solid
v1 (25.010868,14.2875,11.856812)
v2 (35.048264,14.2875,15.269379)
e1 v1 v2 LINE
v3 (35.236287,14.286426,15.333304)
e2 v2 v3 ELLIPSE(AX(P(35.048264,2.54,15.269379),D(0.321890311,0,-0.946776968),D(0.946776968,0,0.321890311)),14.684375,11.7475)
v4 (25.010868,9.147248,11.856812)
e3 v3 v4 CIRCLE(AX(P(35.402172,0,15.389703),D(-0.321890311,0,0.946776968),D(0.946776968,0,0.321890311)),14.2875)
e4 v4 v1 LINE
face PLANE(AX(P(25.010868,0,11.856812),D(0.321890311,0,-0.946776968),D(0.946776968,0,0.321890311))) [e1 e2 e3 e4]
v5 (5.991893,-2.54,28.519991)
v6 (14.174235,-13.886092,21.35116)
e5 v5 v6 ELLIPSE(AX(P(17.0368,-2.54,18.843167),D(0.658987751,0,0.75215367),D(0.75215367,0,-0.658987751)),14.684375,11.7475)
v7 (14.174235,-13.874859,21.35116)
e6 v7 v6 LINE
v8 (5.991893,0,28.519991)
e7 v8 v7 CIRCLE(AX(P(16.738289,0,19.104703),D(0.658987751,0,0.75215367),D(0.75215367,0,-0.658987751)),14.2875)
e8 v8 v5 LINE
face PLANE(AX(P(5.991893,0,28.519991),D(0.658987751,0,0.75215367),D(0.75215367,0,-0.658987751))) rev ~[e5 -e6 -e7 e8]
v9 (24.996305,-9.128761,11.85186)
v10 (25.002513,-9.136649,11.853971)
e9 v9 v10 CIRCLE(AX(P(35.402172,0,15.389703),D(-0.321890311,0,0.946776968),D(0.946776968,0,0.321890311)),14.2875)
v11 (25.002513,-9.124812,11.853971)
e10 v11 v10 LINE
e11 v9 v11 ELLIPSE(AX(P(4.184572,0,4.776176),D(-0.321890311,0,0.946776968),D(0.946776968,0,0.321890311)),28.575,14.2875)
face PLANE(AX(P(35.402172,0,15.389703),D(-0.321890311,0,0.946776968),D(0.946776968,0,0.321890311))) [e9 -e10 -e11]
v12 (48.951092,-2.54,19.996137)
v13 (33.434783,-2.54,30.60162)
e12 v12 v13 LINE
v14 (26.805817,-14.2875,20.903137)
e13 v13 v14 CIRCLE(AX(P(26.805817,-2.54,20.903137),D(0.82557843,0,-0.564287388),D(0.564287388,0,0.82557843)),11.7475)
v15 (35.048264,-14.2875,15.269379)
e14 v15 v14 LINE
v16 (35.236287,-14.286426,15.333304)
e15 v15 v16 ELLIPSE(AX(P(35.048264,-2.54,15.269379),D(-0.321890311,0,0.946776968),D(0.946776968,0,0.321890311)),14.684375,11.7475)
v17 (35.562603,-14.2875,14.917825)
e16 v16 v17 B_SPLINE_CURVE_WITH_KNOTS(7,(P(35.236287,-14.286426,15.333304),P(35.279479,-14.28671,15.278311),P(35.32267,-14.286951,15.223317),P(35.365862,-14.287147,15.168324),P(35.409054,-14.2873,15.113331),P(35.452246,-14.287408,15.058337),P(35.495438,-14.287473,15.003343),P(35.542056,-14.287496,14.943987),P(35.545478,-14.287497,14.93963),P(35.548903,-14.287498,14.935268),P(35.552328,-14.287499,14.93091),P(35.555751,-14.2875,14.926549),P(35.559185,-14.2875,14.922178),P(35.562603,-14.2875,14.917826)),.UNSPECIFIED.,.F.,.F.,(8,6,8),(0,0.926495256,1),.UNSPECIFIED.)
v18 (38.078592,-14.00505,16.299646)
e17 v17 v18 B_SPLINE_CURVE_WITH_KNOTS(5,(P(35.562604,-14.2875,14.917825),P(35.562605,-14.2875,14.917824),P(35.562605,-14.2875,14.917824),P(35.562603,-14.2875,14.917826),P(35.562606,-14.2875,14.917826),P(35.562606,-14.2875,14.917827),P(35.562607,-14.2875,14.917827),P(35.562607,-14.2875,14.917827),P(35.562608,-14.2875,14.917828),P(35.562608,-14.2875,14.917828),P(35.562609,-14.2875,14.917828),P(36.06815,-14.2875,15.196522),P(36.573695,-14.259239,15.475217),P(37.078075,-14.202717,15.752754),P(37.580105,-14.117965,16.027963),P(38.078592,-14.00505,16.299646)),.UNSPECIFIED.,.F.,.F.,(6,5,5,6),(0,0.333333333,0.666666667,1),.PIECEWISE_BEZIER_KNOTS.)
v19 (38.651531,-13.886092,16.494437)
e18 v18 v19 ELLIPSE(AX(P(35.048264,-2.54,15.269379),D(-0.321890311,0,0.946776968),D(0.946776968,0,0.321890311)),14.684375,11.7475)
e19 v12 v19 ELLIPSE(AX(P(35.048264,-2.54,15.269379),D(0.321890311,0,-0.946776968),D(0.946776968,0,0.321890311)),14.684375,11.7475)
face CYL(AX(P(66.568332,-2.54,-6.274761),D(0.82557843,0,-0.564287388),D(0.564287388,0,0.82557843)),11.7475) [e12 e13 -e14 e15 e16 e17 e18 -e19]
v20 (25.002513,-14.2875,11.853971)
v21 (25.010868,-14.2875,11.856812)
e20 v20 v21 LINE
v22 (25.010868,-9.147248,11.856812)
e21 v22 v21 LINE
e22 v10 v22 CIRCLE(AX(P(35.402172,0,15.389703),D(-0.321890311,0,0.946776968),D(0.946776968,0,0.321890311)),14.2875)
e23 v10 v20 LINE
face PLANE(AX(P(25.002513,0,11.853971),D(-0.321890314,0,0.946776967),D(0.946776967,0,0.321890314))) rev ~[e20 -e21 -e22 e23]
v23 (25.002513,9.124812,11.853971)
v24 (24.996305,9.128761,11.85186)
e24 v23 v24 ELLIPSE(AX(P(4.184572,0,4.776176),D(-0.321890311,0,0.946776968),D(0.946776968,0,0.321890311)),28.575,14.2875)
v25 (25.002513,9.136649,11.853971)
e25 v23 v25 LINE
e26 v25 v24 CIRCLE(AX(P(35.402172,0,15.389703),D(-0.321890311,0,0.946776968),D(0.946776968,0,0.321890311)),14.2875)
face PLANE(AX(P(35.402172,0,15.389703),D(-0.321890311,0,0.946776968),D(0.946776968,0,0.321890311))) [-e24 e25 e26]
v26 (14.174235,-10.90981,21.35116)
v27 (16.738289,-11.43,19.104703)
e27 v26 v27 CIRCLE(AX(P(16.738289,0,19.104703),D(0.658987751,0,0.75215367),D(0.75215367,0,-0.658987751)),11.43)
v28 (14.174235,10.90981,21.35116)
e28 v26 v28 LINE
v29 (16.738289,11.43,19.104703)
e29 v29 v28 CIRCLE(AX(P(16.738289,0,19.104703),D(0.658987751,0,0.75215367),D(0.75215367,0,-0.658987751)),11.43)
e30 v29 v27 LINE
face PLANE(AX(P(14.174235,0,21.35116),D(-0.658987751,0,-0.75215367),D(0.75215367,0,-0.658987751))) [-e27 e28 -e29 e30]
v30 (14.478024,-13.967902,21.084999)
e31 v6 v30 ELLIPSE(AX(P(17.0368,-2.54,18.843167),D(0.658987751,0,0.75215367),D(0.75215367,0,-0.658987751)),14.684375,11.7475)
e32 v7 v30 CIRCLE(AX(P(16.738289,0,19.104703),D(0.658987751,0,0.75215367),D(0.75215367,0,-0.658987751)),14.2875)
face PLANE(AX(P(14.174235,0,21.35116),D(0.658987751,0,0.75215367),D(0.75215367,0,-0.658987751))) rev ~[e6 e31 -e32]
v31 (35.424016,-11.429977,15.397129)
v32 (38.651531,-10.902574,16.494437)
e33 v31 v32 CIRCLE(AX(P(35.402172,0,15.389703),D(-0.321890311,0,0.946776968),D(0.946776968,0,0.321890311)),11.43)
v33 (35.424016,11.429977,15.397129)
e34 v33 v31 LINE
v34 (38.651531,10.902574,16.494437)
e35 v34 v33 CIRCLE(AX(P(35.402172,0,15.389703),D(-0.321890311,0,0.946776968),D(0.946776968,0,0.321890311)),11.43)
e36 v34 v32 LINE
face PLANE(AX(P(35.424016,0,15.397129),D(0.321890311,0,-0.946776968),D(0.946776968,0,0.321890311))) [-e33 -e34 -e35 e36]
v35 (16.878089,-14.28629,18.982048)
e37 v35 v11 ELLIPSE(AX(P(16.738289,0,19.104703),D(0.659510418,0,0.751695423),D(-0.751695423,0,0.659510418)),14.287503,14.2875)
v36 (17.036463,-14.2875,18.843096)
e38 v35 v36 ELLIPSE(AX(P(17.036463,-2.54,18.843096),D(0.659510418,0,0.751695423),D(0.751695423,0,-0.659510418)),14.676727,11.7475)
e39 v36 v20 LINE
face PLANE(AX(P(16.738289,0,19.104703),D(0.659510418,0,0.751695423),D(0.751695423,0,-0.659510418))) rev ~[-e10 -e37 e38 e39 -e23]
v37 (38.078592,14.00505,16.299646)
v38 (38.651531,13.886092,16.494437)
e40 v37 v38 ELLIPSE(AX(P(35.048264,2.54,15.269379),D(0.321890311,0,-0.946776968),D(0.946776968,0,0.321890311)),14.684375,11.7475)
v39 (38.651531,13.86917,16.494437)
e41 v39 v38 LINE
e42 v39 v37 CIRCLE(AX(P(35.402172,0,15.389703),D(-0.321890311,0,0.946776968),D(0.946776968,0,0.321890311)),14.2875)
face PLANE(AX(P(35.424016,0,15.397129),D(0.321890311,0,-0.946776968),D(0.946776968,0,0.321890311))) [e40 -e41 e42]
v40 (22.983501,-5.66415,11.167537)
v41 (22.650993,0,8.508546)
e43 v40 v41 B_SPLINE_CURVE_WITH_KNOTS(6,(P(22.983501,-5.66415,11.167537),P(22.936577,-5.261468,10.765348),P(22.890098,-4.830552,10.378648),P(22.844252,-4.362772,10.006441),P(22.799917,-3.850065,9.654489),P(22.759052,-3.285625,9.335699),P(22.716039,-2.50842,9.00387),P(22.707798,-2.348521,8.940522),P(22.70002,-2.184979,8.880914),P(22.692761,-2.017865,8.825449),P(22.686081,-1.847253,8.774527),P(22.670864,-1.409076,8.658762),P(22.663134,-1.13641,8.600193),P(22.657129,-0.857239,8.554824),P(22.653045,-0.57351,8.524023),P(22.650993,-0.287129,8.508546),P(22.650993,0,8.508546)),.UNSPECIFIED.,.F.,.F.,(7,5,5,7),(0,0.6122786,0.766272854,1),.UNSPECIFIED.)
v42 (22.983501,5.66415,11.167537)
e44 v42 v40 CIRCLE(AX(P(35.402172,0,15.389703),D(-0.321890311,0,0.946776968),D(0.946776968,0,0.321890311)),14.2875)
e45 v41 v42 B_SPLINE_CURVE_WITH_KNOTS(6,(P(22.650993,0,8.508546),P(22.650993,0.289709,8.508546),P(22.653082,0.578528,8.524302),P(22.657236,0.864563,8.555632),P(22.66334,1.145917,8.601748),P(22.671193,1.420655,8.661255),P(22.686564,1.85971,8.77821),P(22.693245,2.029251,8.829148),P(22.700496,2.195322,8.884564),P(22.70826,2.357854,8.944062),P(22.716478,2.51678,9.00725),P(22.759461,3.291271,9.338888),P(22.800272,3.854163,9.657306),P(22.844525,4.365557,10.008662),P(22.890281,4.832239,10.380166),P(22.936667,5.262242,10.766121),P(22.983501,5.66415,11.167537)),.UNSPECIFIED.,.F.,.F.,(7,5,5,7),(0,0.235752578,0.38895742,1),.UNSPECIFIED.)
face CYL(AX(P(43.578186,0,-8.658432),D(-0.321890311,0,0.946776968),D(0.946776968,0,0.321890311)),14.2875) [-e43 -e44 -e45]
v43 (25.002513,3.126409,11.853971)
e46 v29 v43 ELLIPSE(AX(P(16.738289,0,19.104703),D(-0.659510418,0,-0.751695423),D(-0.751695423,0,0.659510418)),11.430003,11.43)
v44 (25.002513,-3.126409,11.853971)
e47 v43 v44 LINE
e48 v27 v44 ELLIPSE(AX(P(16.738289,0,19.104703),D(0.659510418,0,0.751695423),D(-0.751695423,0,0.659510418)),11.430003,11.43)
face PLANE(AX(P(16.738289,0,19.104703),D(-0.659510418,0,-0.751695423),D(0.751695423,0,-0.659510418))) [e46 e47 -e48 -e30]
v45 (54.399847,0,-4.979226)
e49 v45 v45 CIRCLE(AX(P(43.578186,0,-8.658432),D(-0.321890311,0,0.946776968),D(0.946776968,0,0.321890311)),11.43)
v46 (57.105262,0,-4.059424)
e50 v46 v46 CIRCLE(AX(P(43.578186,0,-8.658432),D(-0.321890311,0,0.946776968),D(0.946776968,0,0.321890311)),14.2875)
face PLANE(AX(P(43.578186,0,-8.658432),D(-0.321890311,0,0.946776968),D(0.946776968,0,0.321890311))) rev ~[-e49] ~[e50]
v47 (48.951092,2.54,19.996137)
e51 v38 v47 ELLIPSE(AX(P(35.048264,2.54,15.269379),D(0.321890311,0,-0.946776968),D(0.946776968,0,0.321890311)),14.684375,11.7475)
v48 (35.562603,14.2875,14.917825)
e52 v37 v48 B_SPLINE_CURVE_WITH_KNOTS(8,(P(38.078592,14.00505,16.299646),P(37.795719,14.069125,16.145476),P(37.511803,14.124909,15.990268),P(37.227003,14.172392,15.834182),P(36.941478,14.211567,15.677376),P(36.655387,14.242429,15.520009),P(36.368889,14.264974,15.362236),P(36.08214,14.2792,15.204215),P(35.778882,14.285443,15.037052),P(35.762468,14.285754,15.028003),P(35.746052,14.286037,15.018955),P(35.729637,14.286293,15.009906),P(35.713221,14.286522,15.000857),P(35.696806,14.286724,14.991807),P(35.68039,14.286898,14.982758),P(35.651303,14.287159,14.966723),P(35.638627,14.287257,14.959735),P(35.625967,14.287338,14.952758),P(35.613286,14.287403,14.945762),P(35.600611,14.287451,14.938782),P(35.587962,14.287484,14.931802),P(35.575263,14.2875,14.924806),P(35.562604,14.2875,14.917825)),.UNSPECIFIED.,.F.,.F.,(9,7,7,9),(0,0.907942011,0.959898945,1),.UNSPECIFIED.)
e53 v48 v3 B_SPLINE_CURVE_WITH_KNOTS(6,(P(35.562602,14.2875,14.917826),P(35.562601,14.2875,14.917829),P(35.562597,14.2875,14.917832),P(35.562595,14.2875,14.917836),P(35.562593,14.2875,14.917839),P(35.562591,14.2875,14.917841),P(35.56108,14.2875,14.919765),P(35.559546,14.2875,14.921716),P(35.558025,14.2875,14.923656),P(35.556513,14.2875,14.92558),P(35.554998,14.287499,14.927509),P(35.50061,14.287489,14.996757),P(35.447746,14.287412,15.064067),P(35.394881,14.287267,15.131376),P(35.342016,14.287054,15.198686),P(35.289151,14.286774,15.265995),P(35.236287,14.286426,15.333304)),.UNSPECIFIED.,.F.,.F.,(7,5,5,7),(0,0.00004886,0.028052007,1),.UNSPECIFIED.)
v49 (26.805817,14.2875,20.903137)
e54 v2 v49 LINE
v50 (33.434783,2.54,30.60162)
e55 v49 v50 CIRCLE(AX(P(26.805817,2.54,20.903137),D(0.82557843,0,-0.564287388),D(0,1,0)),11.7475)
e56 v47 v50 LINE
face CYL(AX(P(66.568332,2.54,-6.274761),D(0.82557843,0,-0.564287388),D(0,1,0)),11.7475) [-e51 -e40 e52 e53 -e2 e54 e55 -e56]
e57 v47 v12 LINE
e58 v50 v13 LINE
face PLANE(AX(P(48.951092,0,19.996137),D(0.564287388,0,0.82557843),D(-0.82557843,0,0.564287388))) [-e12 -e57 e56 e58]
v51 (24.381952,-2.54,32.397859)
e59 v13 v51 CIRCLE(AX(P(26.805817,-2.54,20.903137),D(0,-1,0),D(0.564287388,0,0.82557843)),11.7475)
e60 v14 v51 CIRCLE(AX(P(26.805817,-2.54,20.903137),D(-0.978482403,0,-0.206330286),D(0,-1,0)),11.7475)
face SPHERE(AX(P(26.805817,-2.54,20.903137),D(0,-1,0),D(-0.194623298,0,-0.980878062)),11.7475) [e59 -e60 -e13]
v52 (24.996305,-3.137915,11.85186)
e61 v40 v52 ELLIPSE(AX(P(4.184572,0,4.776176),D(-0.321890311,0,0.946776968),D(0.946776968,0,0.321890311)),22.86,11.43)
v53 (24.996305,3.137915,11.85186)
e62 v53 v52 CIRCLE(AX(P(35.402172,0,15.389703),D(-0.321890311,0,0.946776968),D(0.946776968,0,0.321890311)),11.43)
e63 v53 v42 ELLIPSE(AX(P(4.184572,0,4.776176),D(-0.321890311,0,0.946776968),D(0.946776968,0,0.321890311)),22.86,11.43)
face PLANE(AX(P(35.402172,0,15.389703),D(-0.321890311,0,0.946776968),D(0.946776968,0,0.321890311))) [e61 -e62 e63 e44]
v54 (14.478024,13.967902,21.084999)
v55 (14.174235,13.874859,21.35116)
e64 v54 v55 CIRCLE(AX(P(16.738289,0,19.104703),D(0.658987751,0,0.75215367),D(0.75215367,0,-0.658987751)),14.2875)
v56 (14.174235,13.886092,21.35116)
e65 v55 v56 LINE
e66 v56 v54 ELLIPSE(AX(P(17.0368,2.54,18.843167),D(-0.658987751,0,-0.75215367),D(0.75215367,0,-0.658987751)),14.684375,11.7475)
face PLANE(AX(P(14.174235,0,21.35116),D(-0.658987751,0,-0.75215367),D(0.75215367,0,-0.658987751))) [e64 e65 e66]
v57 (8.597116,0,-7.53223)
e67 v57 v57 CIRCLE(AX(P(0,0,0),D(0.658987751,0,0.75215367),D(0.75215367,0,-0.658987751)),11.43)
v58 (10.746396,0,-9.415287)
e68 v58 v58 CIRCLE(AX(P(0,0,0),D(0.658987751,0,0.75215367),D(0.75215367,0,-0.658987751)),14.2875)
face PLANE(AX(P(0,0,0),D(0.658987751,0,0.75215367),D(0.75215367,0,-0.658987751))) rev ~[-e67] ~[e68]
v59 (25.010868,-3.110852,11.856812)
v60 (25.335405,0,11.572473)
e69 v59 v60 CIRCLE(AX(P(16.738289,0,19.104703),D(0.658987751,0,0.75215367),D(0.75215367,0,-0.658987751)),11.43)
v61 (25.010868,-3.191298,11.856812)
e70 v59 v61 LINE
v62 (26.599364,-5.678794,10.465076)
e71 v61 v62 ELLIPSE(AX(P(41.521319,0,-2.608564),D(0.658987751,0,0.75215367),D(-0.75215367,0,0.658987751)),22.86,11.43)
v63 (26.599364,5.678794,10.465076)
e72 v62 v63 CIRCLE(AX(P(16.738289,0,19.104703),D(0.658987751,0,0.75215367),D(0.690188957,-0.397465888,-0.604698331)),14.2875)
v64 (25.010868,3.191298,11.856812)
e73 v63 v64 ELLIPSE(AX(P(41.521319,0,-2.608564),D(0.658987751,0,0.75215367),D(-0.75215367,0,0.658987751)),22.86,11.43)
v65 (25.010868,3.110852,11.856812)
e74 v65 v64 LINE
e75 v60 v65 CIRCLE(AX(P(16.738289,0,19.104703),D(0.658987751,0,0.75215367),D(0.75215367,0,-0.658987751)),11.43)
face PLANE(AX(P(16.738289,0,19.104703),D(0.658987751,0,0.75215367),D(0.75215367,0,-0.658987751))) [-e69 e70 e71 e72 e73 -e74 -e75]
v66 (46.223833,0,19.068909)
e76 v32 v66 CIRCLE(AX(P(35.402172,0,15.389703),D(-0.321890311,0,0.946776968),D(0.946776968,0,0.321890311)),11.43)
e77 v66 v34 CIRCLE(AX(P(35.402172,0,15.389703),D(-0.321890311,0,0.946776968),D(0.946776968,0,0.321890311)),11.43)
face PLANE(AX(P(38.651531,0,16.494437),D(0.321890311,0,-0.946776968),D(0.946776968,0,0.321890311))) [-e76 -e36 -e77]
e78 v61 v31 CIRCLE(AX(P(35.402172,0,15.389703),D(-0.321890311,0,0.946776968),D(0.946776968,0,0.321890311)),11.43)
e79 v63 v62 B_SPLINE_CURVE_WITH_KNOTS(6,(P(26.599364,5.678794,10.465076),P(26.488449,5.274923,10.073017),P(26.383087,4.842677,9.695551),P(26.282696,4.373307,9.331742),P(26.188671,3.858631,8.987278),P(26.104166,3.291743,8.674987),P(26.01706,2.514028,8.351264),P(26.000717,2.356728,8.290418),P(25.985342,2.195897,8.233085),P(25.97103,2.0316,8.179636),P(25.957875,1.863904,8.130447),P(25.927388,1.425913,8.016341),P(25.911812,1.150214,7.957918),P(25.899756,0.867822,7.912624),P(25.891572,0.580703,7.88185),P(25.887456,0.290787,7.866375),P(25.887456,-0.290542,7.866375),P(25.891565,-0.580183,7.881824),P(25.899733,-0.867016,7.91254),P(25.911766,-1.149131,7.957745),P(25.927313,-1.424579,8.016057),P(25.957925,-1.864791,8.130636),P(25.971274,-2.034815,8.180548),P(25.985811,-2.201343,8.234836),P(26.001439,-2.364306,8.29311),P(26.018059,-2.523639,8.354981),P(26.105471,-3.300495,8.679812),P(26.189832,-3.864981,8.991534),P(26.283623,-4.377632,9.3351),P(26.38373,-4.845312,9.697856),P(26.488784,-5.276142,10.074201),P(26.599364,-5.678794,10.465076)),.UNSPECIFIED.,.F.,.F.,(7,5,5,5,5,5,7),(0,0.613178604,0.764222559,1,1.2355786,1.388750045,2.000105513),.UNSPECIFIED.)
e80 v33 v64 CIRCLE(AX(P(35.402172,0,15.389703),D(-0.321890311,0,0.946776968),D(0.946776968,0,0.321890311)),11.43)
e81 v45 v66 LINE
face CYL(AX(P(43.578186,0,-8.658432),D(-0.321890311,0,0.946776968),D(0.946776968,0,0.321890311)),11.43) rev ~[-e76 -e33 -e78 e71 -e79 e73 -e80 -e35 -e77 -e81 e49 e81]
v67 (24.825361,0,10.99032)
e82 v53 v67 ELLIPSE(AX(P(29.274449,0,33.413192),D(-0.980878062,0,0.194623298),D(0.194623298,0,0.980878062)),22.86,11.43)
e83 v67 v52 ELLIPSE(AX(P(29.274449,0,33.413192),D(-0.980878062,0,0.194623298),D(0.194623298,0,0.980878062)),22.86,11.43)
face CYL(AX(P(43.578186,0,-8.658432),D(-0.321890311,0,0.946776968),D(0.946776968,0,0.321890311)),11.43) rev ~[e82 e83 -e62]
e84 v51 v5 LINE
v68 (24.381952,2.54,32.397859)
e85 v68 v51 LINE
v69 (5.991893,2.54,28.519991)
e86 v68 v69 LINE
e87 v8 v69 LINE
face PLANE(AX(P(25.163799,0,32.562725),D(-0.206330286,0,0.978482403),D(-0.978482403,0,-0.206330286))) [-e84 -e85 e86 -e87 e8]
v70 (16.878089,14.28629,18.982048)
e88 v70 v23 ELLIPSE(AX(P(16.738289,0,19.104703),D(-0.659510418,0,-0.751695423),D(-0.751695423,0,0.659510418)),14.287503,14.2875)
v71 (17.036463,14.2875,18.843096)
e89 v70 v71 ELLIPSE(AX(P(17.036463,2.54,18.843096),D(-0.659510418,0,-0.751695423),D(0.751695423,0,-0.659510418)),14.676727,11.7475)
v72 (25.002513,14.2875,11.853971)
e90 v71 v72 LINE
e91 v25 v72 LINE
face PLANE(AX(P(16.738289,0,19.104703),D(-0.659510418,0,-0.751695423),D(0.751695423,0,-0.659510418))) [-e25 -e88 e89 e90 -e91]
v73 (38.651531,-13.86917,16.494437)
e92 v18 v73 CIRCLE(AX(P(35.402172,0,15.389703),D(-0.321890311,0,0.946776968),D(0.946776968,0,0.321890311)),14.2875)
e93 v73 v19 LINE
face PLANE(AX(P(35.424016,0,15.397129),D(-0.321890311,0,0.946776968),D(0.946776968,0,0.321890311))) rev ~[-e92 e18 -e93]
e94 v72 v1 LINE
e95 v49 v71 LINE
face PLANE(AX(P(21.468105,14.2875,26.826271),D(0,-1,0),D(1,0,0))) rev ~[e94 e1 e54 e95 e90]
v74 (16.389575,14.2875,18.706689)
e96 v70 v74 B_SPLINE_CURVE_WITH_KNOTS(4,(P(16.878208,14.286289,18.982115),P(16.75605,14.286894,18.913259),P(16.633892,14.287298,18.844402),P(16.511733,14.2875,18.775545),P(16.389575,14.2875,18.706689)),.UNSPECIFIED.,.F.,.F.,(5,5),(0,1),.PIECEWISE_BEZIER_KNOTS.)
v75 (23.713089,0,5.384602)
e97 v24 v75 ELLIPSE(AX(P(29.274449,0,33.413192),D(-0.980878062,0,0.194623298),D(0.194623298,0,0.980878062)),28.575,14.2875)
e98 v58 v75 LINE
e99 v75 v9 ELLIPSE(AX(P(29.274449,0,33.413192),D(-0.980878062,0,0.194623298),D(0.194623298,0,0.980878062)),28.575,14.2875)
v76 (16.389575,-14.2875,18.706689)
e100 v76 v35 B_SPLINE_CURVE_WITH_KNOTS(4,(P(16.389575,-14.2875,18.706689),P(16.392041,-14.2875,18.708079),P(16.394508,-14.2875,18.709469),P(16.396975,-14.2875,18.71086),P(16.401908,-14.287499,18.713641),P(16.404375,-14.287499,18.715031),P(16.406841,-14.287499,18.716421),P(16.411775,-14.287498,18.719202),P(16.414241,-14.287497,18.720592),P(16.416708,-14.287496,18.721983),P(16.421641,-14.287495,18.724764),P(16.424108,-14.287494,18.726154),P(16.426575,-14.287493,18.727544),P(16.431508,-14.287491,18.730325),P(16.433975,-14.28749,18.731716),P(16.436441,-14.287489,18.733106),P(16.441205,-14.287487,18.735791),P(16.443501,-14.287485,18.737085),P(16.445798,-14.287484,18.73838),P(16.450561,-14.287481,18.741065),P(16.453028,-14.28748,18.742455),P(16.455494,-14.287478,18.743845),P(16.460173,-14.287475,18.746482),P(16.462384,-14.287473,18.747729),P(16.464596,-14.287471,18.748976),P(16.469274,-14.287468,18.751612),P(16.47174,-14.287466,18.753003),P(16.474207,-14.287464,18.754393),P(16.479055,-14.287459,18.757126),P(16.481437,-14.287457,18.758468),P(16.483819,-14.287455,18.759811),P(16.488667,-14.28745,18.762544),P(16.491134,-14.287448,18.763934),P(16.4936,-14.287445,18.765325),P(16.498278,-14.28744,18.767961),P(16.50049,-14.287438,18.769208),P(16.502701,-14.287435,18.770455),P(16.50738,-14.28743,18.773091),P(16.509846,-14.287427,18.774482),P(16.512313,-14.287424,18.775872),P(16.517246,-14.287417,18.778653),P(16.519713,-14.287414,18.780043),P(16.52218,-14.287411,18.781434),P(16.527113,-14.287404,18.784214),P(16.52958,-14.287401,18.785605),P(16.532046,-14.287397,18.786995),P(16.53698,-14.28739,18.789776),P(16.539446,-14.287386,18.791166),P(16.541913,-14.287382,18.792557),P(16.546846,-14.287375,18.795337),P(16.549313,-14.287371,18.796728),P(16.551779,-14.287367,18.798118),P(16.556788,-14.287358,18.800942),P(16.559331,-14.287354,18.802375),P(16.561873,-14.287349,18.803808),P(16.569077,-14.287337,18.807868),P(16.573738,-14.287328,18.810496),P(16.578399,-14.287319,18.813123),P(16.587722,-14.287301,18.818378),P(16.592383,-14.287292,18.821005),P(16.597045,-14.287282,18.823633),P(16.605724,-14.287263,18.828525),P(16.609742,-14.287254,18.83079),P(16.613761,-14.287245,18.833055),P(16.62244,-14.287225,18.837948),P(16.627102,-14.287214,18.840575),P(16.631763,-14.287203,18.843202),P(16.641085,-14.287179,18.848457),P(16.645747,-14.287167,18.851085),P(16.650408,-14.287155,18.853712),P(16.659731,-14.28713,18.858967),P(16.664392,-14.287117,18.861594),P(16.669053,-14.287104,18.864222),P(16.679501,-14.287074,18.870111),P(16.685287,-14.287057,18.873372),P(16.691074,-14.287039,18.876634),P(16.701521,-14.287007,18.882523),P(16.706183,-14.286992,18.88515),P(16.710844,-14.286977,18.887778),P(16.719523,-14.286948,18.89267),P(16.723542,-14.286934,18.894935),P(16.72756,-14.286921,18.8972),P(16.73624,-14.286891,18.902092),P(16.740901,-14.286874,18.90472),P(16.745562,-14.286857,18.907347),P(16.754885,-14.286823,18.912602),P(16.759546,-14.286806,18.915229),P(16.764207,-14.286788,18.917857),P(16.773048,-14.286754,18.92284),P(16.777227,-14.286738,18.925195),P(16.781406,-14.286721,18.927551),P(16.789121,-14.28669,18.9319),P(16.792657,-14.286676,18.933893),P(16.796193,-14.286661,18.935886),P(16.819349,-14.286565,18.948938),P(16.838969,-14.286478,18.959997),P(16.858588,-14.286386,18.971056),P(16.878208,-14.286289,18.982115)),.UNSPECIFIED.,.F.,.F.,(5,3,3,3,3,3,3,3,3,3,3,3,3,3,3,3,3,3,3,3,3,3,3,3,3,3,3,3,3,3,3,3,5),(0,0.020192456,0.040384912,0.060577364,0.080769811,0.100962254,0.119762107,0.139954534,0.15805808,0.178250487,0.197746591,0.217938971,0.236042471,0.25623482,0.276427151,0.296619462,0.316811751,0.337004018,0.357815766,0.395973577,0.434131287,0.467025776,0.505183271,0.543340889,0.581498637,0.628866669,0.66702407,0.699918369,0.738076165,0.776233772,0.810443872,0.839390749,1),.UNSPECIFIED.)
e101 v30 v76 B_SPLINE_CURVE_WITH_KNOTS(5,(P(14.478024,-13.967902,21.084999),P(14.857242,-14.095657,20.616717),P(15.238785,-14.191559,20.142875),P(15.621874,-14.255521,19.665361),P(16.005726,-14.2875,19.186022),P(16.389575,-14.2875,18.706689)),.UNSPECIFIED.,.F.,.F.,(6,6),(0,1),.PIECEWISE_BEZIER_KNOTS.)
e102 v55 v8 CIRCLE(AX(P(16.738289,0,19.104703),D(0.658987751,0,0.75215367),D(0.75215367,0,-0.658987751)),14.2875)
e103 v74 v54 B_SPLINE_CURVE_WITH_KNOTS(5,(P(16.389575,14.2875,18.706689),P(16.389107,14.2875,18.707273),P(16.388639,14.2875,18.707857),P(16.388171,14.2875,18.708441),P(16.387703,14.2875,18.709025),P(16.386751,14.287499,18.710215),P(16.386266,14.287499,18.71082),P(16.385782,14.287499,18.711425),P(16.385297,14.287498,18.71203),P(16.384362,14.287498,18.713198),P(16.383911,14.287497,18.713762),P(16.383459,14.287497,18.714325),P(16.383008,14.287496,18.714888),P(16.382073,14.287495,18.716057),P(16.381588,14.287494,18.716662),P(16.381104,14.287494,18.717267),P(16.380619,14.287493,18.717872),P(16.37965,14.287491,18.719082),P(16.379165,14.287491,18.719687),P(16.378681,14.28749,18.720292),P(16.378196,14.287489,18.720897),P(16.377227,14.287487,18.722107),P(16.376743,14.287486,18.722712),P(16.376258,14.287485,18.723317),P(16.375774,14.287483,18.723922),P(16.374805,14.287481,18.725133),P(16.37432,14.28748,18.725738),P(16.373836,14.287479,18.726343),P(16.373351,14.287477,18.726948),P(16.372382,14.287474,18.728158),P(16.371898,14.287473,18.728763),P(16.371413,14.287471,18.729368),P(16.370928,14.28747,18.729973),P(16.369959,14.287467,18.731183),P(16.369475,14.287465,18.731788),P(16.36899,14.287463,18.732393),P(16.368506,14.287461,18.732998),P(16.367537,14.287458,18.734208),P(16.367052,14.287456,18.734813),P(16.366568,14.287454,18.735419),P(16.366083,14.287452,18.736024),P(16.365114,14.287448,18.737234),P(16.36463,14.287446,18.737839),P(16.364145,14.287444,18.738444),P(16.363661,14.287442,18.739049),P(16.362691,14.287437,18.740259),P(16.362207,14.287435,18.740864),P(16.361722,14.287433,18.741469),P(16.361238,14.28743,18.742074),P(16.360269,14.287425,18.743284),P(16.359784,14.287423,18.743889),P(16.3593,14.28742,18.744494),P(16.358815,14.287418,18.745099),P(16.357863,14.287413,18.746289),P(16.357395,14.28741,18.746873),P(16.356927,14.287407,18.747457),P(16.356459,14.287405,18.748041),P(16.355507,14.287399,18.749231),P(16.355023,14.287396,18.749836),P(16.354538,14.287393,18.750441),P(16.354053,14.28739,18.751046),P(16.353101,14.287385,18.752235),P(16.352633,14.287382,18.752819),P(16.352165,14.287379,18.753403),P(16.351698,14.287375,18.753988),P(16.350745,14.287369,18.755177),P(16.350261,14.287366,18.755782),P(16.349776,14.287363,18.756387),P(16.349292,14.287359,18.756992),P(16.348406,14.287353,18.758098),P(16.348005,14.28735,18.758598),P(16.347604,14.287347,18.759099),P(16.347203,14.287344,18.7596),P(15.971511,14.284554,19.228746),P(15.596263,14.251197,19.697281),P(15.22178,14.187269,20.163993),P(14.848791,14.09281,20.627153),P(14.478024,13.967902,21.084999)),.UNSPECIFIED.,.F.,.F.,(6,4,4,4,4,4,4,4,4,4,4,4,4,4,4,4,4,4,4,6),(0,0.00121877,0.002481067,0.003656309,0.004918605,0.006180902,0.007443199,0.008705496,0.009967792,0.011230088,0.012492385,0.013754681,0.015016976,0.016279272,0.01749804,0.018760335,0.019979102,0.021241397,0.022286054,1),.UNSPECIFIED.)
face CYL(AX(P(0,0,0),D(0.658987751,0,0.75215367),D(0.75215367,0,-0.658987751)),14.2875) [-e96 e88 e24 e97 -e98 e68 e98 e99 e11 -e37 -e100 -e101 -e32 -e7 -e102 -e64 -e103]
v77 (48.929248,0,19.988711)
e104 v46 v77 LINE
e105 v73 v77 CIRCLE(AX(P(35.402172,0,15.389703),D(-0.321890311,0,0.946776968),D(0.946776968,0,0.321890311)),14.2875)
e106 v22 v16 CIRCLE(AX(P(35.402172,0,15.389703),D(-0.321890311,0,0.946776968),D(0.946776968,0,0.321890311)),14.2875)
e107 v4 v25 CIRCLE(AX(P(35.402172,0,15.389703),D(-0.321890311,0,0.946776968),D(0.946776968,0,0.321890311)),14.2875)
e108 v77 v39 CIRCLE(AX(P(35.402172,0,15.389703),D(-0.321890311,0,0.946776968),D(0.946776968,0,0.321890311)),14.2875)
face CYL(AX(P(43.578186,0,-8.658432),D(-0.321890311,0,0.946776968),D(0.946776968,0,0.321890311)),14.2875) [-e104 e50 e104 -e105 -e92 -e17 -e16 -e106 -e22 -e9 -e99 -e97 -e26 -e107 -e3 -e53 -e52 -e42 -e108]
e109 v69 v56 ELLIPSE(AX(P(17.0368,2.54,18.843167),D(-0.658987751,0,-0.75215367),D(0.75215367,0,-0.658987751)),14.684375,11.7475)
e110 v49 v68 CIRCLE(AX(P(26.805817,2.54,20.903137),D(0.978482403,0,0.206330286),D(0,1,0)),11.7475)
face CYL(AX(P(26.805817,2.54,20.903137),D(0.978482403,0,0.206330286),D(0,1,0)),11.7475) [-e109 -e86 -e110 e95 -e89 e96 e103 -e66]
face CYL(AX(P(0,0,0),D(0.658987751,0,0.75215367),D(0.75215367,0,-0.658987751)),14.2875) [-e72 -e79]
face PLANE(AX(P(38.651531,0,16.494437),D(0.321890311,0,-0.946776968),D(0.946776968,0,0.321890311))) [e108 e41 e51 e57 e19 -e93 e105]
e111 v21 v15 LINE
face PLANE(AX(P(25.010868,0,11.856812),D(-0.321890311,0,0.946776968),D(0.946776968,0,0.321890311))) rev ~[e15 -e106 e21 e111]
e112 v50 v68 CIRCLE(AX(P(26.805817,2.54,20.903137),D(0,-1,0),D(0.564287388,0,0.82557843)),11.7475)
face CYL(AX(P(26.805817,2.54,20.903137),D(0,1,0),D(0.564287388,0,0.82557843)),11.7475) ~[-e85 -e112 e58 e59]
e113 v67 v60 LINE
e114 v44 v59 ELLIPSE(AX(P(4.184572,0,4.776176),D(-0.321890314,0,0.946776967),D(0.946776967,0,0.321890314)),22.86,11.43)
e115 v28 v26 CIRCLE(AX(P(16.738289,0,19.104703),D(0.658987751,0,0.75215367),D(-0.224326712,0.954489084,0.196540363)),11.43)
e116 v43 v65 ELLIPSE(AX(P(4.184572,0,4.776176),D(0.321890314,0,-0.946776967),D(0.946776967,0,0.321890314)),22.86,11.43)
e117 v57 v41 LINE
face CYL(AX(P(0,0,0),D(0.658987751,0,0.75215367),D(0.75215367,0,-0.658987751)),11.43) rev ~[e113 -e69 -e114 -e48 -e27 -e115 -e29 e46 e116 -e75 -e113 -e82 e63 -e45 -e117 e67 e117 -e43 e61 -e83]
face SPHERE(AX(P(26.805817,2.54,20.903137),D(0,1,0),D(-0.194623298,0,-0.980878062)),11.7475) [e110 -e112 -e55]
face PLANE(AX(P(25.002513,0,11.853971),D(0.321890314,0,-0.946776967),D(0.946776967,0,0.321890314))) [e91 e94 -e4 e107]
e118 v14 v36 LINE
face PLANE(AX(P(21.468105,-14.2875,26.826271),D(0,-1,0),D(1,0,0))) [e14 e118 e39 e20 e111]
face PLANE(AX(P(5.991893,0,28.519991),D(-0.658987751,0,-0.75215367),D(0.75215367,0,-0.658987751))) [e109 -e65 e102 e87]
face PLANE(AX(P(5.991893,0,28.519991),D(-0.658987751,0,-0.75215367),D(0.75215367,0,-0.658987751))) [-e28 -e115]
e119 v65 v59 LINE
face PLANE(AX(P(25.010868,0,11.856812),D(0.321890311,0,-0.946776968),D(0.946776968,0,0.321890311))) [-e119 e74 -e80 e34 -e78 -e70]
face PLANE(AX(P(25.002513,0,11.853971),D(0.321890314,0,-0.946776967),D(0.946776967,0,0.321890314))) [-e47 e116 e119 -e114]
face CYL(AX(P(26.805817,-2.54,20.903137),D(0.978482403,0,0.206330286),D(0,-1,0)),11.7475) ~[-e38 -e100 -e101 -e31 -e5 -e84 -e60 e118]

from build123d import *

# Parameters (mm, degrees)
F2_R          = 14.2875
F2_R_2        = 11.43
F5_R          = 14.2875
F5_R_2        = 11.43
F7_DEPTH      = 14.2875
F7_DEPTH_BACK = 14.2875
F8_T1_DEPTH   = 48.1632201407
F8_T3_DEPTH   = 48.1632201407
F8_T5_DEPTH   = 5.08
F8_T10_DEPTH  = 11.7475
F8_T16_DEPTH  = 11.7475


# Not quite as in the source:
# - a fillet or chamfer that OpenCascade refuses, or shapes differently, is made with other operations: its cross-section is extruded or revolved along the edge and cut away or added


with BuildPart() as f3:
    # F3: sweep along a path in F0
    with BuildLine(Plane.XZ) as f3_path:
        Line((43.6000298417, -8.651005595), (35.4240159518, 15.3971294028))
    # F2 (on line) → F3 (sweep)
    with BuildSketch(Plane(origin=(7.1540121537, 0, -21.0421181231), x_dir=(0.9467769684, 0, 0.3218903106), z_dir=(-0.3218903106, 0, 0.9467769684))):
        with Locations((38.471757228, 0)):
            Circle(F2_R)
        with Locations((38.471757228, 0)):
            Circle(F2_R_2, mode=Mode.SUBTRACT)
    sweep(path=f3_path.line)

    # F6: sweep along a path in F0
    with BuildLine(Plane.XZ) as f6_path:
        Line((0, 0), (16.7382888768, 19.1047032292))
    # F5 (on face) → F6 (sweep)
    with BuildSketch(Plane(origin=(0, 0, 0), x_dir=(0.7521536704, 0, -0.6589877511), z_dir=(0.6589877511, 0, 0.7521536704))):
        Circle(F5_R)
        Circle(F5_R_2, mode=Mode.SUBTRACT)
    sweep(path=f6_path.line)

    # F0 (on Front) → F7 (join, two sides)
    with BuildSketch(Plane.XZ) as f7_sk:
        with BuildLine():
            Line((14.1742345569, 21.3511595802), (16.7382888768, 19.1047032292))
            Line((16.7382888768, 19.1047032292), (29.2920055344, 33.4332306512))
            Line((29.2920055344, 33.4332306512), (25.1637988833, 32.5627254125))
            add(Edge.make_bspline(
                [(14.1742345569, 21.3511595802), (18.1555587274, 26.691715757), (21.8910272526, 30.7931889907), (25.1637988833, 32.5627254125)],
                knots=[0.2192972469, 0.2192972469, 0.2192972469, 0.2192972469, 0.4127143591, 0.4127143591, 0.4127143591, 0.4127143591], degree=3))
        make_face()
        Polygon((29.2920055344, 33.4332306512), (16.7382888768, 19.1047032292), (25.0025134025, 11.8539710829), (25.0108680409, 11.8568115377), align=None)
        with BuildLine():
            Line((5.9918933103, 28.5199907224), (14.1742345569, 21.3511595802))
            add(Edge.make_bspline(
                [(14.1742345569, 21.3511595802), (18.1555587274, 26.691715757), (21.8910272526, 30.7931889907), (25.1637988833, 32.5627254125)],
                knots=[0.2192972469, 0.2192972469, 0.2192972469, 0.2192972469, 0.4127143591, 0.4127143591, 0.4127143591, 0.4127143591], degree=3))
            Line((25.1637988833, 32.5627254125), (5.9918933103, 28.5199907224))
        make_face()
        with BuildLine():
            Line((32.7751119786, 31.0525082771), (29.2920055344, 33.4332306512))
            Line((29.2920055344, 33.4332306512), (35.4240159518, 15.3971294028))
            Line((35.4240159518, 15.3971294028), (38.6515313802, 16.4944374051))
            add(Edge.make_bspline(
                [(32.7751119786, 31.0525082771), (35.1243349239, 28.1674701754), (37.0108609747, 22.9504952618), (38.6515313802, 16.4944374051)],
                knots=[0.5872856409, 0.5872856409, 0.5872856409, 0.5872856409, 0.7807027531, 0.7807027531, 0.7807027531, 0.7807027531], degree=3))
        make_face()
        Polygon((35.4240159518, 15.3971294028), (29.2920055344, 33.4332306512), (25.0108680409, 11.8568115377), align=None)
        with BuildLine():
            Line((48.951091888, 19.9961372159), (32.7751119786, 31.0525082771))
            add(Edge.make_bspline(
                [(32.7751119786, 31.0525082771), (35.1243349239, 28.1674701754), (37.0108609747, 22.9504952618), (38.6515313802, 16.4944374051)],
                knots=[0.5872856409, 0.5872856409, 0.5872856409, 0.5872856409, 0.7807027531, 0.7807027531, 0.7807027531, 0.7807027531], degree=3))
            Line((38.6515313802, 16.4944374051), (48.951091888, 19.9961372159))
        make_face()
    extrude(amount=F7_DEPTH)
    extrude(f7_sk.sketch, amount=-F7_DEPTH_BACK)

    # F8: fillet of radius 11.7475 on 5 edges, made by hand

    # F8_s2 → F8_t1 (cut)
    with BuildSketch(Plane(origin=(48.2948087603, 0, -33.0097668872), x_dir=(0, 1, 0), z_dir=(-0.8255784296, 0, 0.5642873884))):
        with BuildLine():
            ThreePointArc((14.2875, -32.3833633586), (10.846736912, -40.6901002706), (2.54, -44.1308633586))
            Line((2.54, -44.1308633586), (14.2875, -44.1308633586))
            Line((14.2875, -44.1308633586), (14.2875, -32.3833633586))
        make_face()
        with BuildLine():
            ThreePointArc((-2.54, -44.1308633586), (-10.846736912, -40.6901002706), (-14.2875, -32.3833633586))
            Line((-14.2875, -32.3833633586), (-14.2875, -44.1308633586))
            Line((-14.2875, -44.1308633586), (-2.54, -44.1308633586))
        make_face()
    extrude(amount=F8_T1_DEPTH, mode=Mode.SUBTRACT)

    # F8_s4 → F8_t3 (cut)
    with BuildSketch(Plane(origin=(29.884780339, 0, 6.3017334256), x_dir=(0, 1, 0), z_dir=(-0.9784824031, 0, -0.2063302857))):
        with BuildLine():
            ThreePointArc((14.2875, -14.9225), (10.846736912, -23.229236912), (2.54, -26.67))
            Line((2.54, -26.67), (14.2875, -26.67))
            Line((14.2875, -26.67), (14.2875, -14.9225))
        make_face()
        with BuildLine():
            ThreePointArc((-14.2875, -14.9225), (-10.846736912, -23.229236912), (-2.54, -26.67))
            Line((-2.54, -26.67), (-14.2875, -26.67))
            Line((-14.2875, -26.67), (-14.2875, -14.9225))
        make_face()
    extrude(amount=F8_T3_DEPTH, mode=Mode.SUBTRACT)

    # F8_s6 → F8_t5 (cut)
    with BuildSketch(Plane.XZ.offset(-2.54)):
        with BuildLine():
            ThreePointArc((33.434782745, 30.6016196872), (29.0921538432, 32.4260021156), (24.3819516188, 32.3978591166))
            Line((24.3819516188, 32.3978591166), (29.2920055344, 33.4332306512))
            Line((29.2920055344, 33.4332306512), (33.434782745, 30.6016196872))
        make_face()
    extrude(amount=F8_T5_DEPTH, mode=Mode.SUBTRACT)


with BuildPart() as f8_tool8:
    # F8_s9 → F8_t10 (new body)
    with BuildSketch(Plane.XZ.offset(-2.54)):
        Polygon((26.8058166503, 20.903137086), (33.434782745, 30.6016196872), (29.2920055344, 33.4332306512), (24.3819516188, 32.3978591166), align=None)
    extrude(amount=-F8_T10_DEPTH)

    # F8_s11 → F8_t12 (revolve, cut)
    with BuildSketch(Plane(origin=(26.8058166503, 2.54, 20.903137086), x_dir=(-0.194623298, 0, -0.9808780617), z_dir=(0.9808780617, 0, -0.194623298))):
        with BuildLine():
            ThreePointArc((0, -11.7475), (11.7475, 0), (0, 11.7475))
            Line((0, 11.7475), (0, -11.7475))
        make_face()
    revolve(axis=Axis((26.8058166503, 2.54, 20.903137086), (0, 1, 0)), mode=Mode.SUBTRACT)


with BuildPart() as f3_1:
    add(f3.part)

    # F8_t7: cut F8_tool8
    add(f8_tool8.part, mode=Mode.SUBTRACT)


with BuildPart() as f8_tool14:
    # F8_s15 → F8_t16 (new body)
    with BuildSketch(Plane.XZ.offset(2.54)):
        Polygon((26.8058166503, 20.903137086), (24.3819516188, 32.3978591166), (29.2920055344, 33.4332306512), (33.434782745, 30.6016196872), align=None)
    extrude(amount=F8_T16_DEPTH)

    # F8_s17 → F8_t18 (revolve, cut)
    with BuildSketch(Plane(origin=(26.8058166503, -2.54, 20.903137086), x_dir=(-0.194623298, 0, -0.9808780617), z_dir=(-0.9808780617, 0, 0.194623298))):
        with BuildLine():
            ThreePointArc((0, -11.7475), (11.7475, 0), (0, 11.7475))
            Line((0, 11.7475), (0, -11.7475))
        make_face()
    revolve(axis=Axis((26.8058166503, -2.54, 20.903137086), (0, -1, 0)), mode=Mode.SUBTRACT)


with BuildPart() as f3_2:
    add(f3_1.part)

    # F8_t13: cut F8_tool14
    add(f8_tool14.part, mode=Mode.SUBTRACT)


solid = f3_2.part
